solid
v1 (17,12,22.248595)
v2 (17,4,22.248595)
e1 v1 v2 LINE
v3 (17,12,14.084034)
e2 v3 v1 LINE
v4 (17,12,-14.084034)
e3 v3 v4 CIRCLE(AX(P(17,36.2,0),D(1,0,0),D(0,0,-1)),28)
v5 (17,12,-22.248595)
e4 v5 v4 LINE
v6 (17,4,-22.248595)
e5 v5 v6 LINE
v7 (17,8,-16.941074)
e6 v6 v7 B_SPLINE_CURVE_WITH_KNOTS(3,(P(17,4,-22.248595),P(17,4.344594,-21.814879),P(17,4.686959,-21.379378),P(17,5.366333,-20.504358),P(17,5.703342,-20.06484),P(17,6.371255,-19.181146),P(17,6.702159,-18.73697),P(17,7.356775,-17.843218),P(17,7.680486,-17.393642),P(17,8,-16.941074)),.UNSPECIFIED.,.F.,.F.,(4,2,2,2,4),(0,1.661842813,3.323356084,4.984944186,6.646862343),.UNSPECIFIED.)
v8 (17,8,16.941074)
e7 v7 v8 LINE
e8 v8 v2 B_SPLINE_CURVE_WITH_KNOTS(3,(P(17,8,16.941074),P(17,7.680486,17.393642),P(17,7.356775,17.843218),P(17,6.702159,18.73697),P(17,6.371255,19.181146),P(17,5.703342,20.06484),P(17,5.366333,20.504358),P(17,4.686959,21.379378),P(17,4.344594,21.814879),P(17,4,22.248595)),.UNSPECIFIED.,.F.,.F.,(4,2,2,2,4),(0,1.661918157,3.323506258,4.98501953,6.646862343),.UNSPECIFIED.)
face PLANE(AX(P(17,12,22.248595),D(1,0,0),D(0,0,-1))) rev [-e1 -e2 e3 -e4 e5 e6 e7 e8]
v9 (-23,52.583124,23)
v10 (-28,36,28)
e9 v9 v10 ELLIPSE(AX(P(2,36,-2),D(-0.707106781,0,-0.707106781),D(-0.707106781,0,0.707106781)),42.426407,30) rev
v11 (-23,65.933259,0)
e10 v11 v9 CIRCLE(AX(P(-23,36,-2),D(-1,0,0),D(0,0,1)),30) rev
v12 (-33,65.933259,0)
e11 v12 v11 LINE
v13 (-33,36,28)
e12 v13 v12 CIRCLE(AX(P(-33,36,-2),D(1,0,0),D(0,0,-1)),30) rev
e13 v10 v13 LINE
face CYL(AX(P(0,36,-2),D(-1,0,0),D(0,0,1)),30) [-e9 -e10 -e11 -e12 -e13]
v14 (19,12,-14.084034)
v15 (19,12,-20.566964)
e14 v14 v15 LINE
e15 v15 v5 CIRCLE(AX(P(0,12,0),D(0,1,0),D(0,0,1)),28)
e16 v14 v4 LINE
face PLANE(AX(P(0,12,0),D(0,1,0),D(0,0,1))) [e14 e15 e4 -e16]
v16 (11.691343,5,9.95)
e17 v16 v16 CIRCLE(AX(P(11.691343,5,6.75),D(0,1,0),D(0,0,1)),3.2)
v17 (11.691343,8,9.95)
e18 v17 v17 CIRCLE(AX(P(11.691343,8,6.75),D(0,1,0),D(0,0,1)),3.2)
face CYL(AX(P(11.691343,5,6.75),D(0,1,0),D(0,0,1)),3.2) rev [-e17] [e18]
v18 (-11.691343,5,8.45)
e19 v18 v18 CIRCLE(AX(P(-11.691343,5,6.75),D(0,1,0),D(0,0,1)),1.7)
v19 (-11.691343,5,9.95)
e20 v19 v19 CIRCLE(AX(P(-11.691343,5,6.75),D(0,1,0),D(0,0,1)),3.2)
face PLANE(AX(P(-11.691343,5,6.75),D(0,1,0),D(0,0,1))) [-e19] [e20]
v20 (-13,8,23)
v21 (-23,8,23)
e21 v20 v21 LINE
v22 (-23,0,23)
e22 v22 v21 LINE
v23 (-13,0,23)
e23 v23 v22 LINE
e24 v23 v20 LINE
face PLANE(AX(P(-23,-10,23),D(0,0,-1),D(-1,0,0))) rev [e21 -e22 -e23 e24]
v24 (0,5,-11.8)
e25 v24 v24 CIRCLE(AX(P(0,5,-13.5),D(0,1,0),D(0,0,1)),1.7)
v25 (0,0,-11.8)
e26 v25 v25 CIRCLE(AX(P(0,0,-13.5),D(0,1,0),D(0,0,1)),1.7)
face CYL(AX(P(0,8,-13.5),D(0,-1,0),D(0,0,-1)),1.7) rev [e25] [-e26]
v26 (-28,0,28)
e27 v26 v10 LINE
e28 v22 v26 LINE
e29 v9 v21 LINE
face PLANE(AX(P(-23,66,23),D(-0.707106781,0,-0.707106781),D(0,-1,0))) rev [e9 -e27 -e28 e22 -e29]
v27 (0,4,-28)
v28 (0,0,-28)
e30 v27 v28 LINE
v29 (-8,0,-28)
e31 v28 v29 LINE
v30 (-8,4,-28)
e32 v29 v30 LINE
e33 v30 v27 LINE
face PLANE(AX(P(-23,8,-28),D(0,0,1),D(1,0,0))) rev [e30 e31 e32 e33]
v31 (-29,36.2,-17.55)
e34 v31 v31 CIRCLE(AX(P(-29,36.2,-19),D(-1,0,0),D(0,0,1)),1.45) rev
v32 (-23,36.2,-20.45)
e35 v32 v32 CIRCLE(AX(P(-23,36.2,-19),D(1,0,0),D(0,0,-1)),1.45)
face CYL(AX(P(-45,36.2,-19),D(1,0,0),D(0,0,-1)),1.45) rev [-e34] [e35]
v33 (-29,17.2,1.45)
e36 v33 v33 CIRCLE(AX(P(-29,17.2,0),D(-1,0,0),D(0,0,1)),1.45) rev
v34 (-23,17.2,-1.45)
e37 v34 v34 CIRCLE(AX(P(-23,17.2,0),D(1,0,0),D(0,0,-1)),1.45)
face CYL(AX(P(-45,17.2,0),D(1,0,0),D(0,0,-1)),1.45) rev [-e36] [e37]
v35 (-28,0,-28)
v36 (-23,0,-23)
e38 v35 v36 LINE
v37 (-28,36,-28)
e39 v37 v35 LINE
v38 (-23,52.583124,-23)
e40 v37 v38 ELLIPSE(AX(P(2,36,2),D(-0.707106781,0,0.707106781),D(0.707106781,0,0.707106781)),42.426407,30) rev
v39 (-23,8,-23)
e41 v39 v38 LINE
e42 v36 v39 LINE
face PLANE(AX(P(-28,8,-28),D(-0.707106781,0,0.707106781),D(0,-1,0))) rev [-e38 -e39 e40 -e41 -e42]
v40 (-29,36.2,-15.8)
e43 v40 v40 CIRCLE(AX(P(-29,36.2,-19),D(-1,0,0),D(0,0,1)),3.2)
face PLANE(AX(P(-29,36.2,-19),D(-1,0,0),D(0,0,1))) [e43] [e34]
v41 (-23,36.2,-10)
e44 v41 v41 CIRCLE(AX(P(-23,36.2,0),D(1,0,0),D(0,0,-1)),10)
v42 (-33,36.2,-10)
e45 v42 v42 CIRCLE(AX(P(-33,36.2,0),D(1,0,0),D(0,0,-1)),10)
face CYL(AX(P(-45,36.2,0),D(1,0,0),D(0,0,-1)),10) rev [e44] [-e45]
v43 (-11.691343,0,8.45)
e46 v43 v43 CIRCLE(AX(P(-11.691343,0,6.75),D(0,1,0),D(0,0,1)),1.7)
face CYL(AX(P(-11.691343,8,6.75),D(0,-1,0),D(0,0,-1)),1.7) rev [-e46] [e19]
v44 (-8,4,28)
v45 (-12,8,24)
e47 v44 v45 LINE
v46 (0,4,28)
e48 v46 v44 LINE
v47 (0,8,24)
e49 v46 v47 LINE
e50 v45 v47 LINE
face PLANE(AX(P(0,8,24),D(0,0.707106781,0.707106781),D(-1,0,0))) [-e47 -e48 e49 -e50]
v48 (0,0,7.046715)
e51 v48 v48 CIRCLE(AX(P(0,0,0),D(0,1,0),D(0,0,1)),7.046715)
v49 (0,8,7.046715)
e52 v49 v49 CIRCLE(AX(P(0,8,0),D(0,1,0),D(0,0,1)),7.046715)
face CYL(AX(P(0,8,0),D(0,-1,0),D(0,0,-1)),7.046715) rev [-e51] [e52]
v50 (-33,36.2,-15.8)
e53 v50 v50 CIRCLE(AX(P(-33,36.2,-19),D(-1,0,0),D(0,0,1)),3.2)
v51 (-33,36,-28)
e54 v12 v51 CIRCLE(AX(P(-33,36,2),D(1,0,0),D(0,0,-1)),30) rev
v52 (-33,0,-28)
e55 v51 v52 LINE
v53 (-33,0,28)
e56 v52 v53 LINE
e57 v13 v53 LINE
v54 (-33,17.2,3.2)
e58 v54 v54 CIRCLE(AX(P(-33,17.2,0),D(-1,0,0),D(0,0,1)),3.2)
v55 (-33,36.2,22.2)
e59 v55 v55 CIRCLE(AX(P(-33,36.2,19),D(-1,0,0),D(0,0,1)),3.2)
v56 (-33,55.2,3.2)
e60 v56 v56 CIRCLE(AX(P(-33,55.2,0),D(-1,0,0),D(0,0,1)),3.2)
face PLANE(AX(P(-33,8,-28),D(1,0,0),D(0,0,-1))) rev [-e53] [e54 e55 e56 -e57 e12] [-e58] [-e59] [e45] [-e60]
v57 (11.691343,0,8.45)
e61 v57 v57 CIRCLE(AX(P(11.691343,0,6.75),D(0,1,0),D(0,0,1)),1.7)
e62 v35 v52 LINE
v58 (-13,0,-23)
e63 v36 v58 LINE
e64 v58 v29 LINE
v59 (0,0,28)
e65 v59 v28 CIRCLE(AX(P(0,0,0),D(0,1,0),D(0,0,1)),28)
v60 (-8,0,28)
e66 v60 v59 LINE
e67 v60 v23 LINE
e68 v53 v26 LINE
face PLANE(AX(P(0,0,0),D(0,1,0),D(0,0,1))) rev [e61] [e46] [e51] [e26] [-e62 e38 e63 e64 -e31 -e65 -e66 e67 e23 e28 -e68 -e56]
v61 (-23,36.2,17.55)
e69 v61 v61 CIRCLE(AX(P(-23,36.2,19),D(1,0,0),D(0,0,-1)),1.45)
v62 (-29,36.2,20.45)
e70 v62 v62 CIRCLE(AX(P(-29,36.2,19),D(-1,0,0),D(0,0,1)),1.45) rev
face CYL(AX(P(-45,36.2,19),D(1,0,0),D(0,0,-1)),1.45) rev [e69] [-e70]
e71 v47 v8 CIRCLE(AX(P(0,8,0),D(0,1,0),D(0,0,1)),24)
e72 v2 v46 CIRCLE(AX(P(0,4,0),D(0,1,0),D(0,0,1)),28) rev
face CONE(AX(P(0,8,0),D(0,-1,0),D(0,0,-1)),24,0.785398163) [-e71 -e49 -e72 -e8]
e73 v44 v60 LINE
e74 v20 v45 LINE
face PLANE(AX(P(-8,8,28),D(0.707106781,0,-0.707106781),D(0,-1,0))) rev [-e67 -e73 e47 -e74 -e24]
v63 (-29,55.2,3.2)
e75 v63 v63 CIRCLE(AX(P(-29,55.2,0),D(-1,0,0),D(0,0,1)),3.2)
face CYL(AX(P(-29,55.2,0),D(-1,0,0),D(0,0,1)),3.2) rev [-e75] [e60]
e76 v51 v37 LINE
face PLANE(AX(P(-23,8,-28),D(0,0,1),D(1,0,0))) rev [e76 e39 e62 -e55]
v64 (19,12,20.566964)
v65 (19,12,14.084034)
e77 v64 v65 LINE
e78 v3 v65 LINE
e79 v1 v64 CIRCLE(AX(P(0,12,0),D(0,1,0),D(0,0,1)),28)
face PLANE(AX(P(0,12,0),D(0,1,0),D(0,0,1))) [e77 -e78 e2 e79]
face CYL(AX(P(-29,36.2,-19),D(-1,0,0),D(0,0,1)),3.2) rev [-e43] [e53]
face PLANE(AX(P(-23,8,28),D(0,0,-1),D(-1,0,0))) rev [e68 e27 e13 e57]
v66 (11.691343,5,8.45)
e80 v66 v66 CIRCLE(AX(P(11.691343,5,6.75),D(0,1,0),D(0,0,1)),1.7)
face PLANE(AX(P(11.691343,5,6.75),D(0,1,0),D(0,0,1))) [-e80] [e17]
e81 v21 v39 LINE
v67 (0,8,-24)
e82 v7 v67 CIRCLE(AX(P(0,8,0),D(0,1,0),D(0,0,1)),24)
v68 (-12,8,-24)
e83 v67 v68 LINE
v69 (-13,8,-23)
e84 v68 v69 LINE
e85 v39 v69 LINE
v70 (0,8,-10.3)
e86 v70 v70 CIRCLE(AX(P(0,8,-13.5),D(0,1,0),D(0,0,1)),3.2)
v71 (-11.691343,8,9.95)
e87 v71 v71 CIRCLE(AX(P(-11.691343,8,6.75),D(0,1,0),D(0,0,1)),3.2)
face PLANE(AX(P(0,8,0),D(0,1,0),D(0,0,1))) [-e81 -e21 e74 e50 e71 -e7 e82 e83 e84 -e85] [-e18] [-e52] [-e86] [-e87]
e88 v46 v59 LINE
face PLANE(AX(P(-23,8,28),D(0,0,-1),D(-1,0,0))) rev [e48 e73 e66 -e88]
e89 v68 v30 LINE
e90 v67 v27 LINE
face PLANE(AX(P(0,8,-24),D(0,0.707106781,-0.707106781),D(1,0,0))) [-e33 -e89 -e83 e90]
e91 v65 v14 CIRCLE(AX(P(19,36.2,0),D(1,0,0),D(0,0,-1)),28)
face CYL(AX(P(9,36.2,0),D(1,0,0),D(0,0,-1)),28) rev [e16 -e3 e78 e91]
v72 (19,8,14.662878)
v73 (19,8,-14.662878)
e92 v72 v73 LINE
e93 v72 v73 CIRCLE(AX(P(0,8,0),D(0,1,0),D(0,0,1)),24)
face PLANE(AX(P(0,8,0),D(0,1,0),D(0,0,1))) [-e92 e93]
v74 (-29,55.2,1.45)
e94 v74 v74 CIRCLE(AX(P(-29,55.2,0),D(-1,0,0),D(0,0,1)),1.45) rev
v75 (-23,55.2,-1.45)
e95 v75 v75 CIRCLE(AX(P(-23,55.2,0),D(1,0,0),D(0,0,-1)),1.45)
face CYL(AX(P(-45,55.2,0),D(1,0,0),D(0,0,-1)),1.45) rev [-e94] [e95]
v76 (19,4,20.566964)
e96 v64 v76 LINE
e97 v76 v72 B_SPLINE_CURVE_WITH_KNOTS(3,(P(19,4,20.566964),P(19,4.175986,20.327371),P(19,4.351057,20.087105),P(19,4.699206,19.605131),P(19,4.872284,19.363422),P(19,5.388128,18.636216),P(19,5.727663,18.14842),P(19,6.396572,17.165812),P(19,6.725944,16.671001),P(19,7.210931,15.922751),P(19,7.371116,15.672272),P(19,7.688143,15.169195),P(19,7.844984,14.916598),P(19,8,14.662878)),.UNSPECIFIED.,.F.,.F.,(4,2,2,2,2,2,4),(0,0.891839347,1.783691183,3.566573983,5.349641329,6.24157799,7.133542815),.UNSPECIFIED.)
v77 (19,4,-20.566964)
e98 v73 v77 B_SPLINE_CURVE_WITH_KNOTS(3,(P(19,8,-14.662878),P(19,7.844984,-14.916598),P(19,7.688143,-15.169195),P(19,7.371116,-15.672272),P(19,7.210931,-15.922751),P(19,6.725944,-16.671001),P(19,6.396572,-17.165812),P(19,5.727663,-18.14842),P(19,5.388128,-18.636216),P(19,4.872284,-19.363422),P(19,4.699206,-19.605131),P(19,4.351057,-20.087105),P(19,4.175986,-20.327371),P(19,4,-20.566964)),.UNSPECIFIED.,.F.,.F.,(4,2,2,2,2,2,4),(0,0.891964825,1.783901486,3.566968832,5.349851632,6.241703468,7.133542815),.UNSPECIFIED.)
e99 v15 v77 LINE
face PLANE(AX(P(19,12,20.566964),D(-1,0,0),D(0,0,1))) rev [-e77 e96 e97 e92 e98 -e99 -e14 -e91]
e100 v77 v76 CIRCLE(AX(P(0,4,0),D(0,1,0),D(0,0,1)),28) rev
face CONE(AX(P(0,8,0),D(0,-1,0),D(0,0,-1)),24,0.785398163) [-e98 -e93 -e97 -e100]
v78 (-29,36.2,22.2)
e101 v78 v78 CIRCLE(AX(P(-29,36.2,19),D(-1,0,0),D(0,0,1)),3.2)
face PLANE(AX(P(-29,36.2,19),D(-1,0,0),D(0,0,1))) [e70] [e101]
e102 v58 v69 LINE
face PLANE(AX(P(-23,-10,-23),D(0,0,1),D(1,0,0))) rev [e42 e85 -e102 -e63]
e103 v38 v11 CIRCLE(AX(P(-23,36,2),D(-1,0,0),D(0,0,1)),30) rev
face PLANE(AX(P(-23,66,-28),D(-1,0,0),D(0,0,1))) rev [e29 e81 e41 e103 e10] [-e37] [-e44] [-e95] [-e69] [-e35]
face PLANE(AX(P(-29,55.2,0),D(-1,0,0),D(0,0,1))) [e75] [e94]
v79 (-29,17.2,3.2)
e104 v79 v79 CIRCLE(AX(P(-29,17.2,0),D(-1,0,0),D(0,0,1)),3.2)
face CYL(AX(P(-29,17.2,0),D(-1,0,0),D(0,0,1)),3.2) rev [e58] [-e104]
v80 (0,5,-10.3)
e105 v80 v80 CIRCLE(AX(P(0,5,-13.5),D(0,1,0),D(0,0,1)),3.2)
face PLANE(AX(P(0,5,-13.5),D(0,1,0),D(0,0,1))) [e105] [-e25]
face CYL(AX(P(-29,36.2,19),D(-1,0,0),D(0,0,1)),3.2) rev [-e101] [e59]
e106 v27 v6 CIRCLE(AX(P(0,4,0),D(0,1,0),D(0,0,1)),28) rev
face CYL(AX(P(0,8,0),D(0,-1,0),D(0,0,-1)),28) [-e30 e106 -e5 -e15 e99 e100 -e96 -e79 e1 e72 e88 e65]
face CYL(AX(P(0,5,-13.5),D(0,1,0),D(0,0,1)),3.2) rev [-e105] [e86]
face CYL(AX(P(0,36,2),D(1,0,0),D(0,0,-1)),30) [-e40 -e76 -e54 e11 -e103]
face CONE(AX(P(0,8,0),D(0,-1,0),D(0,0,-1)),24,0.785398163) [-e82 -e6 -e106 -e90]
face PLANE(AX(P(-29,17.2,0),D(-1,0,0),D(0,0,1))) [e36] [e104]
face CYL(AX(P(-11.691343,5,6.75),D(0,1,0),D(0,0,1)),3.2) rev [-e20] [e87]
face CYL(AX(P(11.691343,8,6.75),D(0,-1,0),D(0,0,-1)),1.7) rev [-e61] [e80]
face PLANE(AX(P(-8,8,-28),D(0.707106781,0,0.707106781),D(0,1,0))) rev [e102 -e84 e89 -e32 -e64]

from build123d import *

# Parameters (mm, degrees)
SKETCH_1_R          = 1.7
SKETCH_1_R_2        = 7.046714779
EXTRUDE_2_DEPTH     = 8
SKETCH_2_W          = 10
SKETCH_2_H          = 56
EXTRUDE_3_DEPTH     = 58
SKETCH_3_R          = 1.45
SKETCH_3_R_2        = 10
CUT_EXTRUDE_1_DEPTH = 22
SKETCH_5_W          = 10
SKETCH_5_H          = 20.367119739
CUT_EXTRUDE_3_DEPTH = 18
CHAMFER_1_SIZE      = 5
FILLET_1_R          = 30
SKETCH_6_R          = 3.2
CUT_EXTRUDE_4_DEPTH = 4
SKETCH_7_R          = 3.2
CUT_EXTRUDE_5_DEPTH = 3
EXTRUDE_4_DEPTH     = 4
SKETCH_9_R          = 28
CUT_EXTRUDE_6_DEPTH = 10
CHAMFER_2_SIZE      = 4


# Some blends are built 0.0001 mm under size
with BuildPart() as part:
    # 草图1 → 凸台-拉伸2 (new body)
    with BuildSketch(Plane(origin=(0, 0, 0), x_dir=(1, 0, 0), z_dir=(0, 1, 0))):
        with BuildLine():
            Line((-23, 28), (-33, 28))
            Line((-33, 28), (-33, -28))
            Line((-33, -28), (-23, -28))
            Line((-23, -28), (0, -28))
            ThreePointArc((0, -28), (28, 0), (0, 28))
            Line((0, 28), (-23, 28))
        make_face()
        with Locations(Location((0, 13.5, 0), (0, 0, 270))):
            Circle(SKETCH_1_R, mode=Mode.SUBTRACT)
        with Locations(Location((11.691342951, -6.75, 0), (0, 0, 270))):
            Circle(SKETCH_1_R, mode=Mode.SUBTRACT)
        with Locations(Location((-11.691342951, -6.75, 0), (0, 0, 270))):
            Circle(SKETCH_1_R, mode=Mode.SUBTRACT)
        with Locations(Location((0, 0, 0), (0, 0, 270))):
            Circle(SKETCH_1_R_2, mode=Mode.SUBTRACT)
    extrude(amount=EXTRUDE_2_DEPTH)

    # 草图2 → 凸台-拉伸3 (add)
    with BuildSketch(Plane(origin=(0, 8, 0), x_dir=(1, 0, 0), z_dir=(0, 1, 0))):
        with Locations((-28, 0)):
            Rectangle(SKETCH_2_W, SKETCH_2_H)
    extrude(amount=EXTRUDE_3_DEPTH)

    # 草图3 → 切除-拉伸1 (cut)
    with BuildSketch(Plane(origin=(-23, 0, 0), x_dir=(0, 0, -1), z_dir=(1, 0, 0))):
        with Locations((0, 55.2)):
            Circle(SKETCH_3_R)
        with Locations((19, 36.2)):
            Circle(SKETCH_3_R)
        with Locations((0, 17.2)):
            Circle(SKETCH_3_R)
        with Locations((-19, 36.2)):
            Circle(SKETCH_3_R)
        with Locations((0, 36.2)):
            Circle(SKETCH_3_R_2)
    extrude(amount=-CUT_EXTRUDE_1_DEPTH, mode=Mode.SUBTRACT)

    # 草图5 → 切除-拉伸3 (cut)
    with BuildSketch(Plane(origin=(0, 8, 0), x_dir=(1, 0, 0), z_dir=(0, 1, 0))):
        with Locations((-18, 33.18355987)):
            Rectangle(SKETCH_5_W, SKETCH_5_H)
        with Locations((-18, -33.18355987)):
            Rectangle(SKETCH_5_W, SKETCH_5_H)
    extrude(amount=-CUT_EXTRUDE_3_DEPTH, mode=Mode.SUBTRACT)

    # 倒角1
    chamfer_1_edges = [part.edges().sort_by_distance(p)[0] for p in [
        (-23, 33, 28),
        (-23, 33, -28),
        (-13, 4, -28),
        (-13, 4, 28),
    ]]
    chamfer(chamfer_1_edges, length=CHAMFER_1_SIZE - 0.0001)  # a hair under: the kernel refuses the full size

    # 圆角1
    # the kernel refuses this fillet: 30 mm, written as the material it takes off along each edge
    with BuildSketch(Plane(origin=(-108, 66, -28), x_dir=(0, -1, 0), z_dir=(1, 0, 0)), Plane(origin=(47.0001, 66, 28), x_dir=(0, -1, 0), z_dir=(-1, 0, 0))) as fillet_1_piece_1:
        with BuildLine():
            CenterArc((FILLET_1_R, -FILLET_1_R), FILLET_1_R, 90, 90)
            Line((0, -FILLET_1_R), (0, 0))
            Line((0, 0), (FILLET_1_R, 0))
        make_face()
    extrude(amount=155.0001, mode=Mode.SUBTRACT)

    # 草图6 → 切除-拉伸4 (cut)
    with BuildSketch(Plane.ZY.offset(33)):
        with Locations((-19, 36.2)):
            Circle(SKETCH_6_R)
        with Locations((0, 55.2)):
            Circle(SKETCH_6_R)
        with Locations((19, 36.2)):
            Circle(SKETCH_6_R)
        with Locations((0, 17.2)):
            Circle(SKETCH_6_R)
    extrude(amount=-CUT_EXTRUDE_4_DEPTH, mode=Mode.SUBTRACT)

    # 草图7 → 切除-拉伸5 (cut)
    with BuildSketch(Plane(origin=(0, 8, 0), x_dir=(1, 0, 0), z_dir=(0, 1, 0))):
        with Locations(Location((0, 13.5, 0), (0, 0, 270))):
            Circle(SKETCH_7_R)
        with Locations(Location((11.691342951, -6.75, 0), (0, 0, 270))):
            Circle(SKETCH_7_R)
        with Locations(Location((-11.691342951, -6.75, 0), (0, 0, 270))):
            Circle(SKETCH_7_R)
    extrude(amount=-CUT_EXTRUDE_5_DEPTH, mode=Mode.SUBTRACT)

    # 草图8 → 凸台-拉伸4 (add)
    with BuildSketch(Plane(origin=(0, 8, 0), x_dir=(1, 0, 0), z_dir=(0, 1, 0))):
        with BuildLine():
            Line((17, -22.248595461), (17, 22.248595461))
            ThreePointArc((17, 22.248595461), (18.01962739, 21.4311229), (19, 20.566963801))
            Line((19, 20.566963801), (19, -20.566963801))
            ThreePointArc((19, -20.566963801), (18.01962739, -21.4311229), (17, -22.248595461))
        make_face()
    extrude(amount=EXTRUDE_4_DEPTH)

    # 草图9 → 切除-拉伸6 (cut)
    with BuildSketch(Plane(origin=(19, 0, 0), x_dir=(0, 0, -1), z_dir=(1, 0, 0))):
        with Locations((0, 36.2)):
            Circle(SKETCH_9_R)
    extrude(amount=-CUT_EXTRUDE_6_DEPTH, mode=Mode.SUBTRACT)

    # 倒角2
    # the kernel refuses this chamfer: 4 mm, written as the material it takes off along each edge
    with BuildSketch(Plane(origin=(0, 8, 28), x_dir=(0, 0.027495876610586487, -0.9996219169112968), z_dir=(-1, 0, 0))) as chamfer_2_piece_1:
        Polygon((CHAMFER_2_SIZE * 0.999621916911, CHAMFER_2_SIZE * 0.0274958766106), (-CHAMFER_2_SIZE * 0.0274958766106, CHAMFER_2_SIZE * 0.999621916911), (0, 0), align=None)
    extrude(amount=18.286831952, mode=Mode.SUBTRACT)
    with BuildSketch(Plane(origin=(0, 8, 0), x_dir=(0.369313229341893, 0, 0.9293049761155173), z_dir=(-0.9293049761155173, 0, 0.369313229341893))) as chamfer_2_piece_2_section:
        Polygon((28, -CHAMFER_2_SIZE), (28 - CHAMFER_2_SIZE, 0), (28, 0), align=None)
    chamfer_2_piece_2 = revolve(axis=Axis((0, 8, 0), (0, 1, 0)), revolution_arc=136.653462803, mode=Mode.PRIVATE)
    chamfer_2_piece_2 = split(chamfer_2_piece_2, bisect_by=Plane(origin=(17, 6.694433411, 22.783727906), z_dir=(-1, 0, 0)), keep=Keep.TOP, mode=Mode.PRIVATE)
    add(chamfer_2_piece_2, mode=Mode.SUBTRACT)
    with BuildSketch(Plane(origin=(0, 8, 0), x_dir=(0.369313229341893, 0, 0.9293049761155173), z_dir=(-0.9293049761155173, 0, 0.369313229341893))) as chamfer_2_piece_3_section:
        Polygon((28, -CHAMFER_2_SIZE), (28 - CHAMFER_2_SIZE, 0), (28, 0), align=None)
    chamfer_2_piece_3 = revolve(axis=Axis((0, 8, 0), (0, 1, 0)), revolution_arc=136.653462803, mode=Mode.PRIVATE)
    chamfer_2_piece_3 = split(chamfer_2_piece_3, bisect_by=Plane(origin=(19, 6.048939882, 0), z_dir=(1, 0, 0)), keep=Keep.TOP, mode=Mode.PRIVATE)
    add(chamfer_2_piece_3, mode=Mode.SUBTRACT)
    with BuildSketch(Plane(origin=(0, 8, 0), x_dir=(0.8520392640465919, 0, -0.5234778815985848), z_dir=(0.5234778815985848, 0, 0.8520392640465919))) as chamfer_2_piece_4_section:
        Polygon((28, -CHAMFER_2_SIZE), (28 - CHAMFER_2_SIZE, 0), (28, 0), align=None)
    chamfer_2_piece_4 = revolve(axis=Axis((0, 8, 0), (0, 1, 0)), revolution_arc=58.434168598, mode=Mode.PRIVATE)
    chamfer_2_piece_4 = split(chamfer_2_piece_4, bisect_by=Plane(origin=(19, 6.574014783, -16.582020982), z_dir=(1, 0, 0)), keep=Keep.TOP, mode=Mode.PRIVATE)
    add(chamfer_2_piece_4, mode=Mode.SUBTRACT)
    with BuildSketch(Plane(origin=(0, 8, 0), x_dir=(0.8520392640465919, 0, -0.5234778815985848), z_dir=(0.5234778815985848, 0, 0.8520392640465919))) as chamfer_2_piece_5_section:
        Polygon((28, -CHAMFER_2_SIZE), (28 - CHAMFER_2_SIZE, 0), (28, 0), align=None)
    chamfer_2_piece_5 = revolve(axis=Axis((0, 8, 0), (0, 1, 0)), revolution_arc=58.434168598, mode=Mode.PRIVATE)
    chamfer_2_piece_5 = split(chamfer_2_piece_5, bisect_by=Plane(origin=(17, 6.670131388, -24.579888545), z_dir=(-1, 0, 0)), keep=Keep.TOP, mode=Mode.PRIVATE)
    add(chamfer_2_piece_5, mode=Mode.SUBTRACT)
    with BuildSketch(Plane(origin=(0, 8, 0), x_dir=(0, 0, 1), z_dir=(-1, 0, 0))) as chamfer_2_piece_6_section:
        Polygon((28, -CHAMFER_2_SIZE), (28 - CHAMFER_2_SIZE, 0), (28, 0), align=None)
    chamfer_2_piece_6 = revolve(axis=Axis((0, 8, 0), (0, 1, 0)), revolution_arc=58.434168598, mode=Mode.PRIVATE)
    chamfer_2_piece_6 = split(chamfer_2_piece_6, bisect_by=Plane(origin=(17, 6.670131388, 24.579888545), z_dir=(-1, 0, 0)), keep=Keep.TOP, mode=Mode.PRIVATE)
    add(chamfer_2_piece_6, mode=Mode.SUBTRACT)
    with BuildSketch(Plane(origin=(0, 8, 0), x_dir=(0, 0, 1), z_dir=(-1, 0, 0))) as chamfer_2_piece_7_section:
        Polygon((28, -CHAMFER_2_SIZE), (28 - CHAMFER_2_SIZE, 0), (28, 0), align=None)
    chamfer_2_piece_7 = revolve(axis=Axis((0, 8, 0), (0, 1, 0)), revolution_arc=58.434168598, mode=Mode.PRIVATE)
    chamfer_2_piece_7 = split(chamfer_2_piece_7, bisect_by=Plane(origin=(19, 6.574014783, 16.582020982), z_dir=(1, 0, 0)), keep=Keep.TOP, mode=Mode.PRIVATE)
    add(chamfer_2_piece_7, mode=Mode.SUBTRACT)
    with BuildSketch(Plane(origin=(-18.286831952, 8, -28), x_dir=(0, -0.9996219169112968, -0.027495876610586487), z_dir=(1, 0, 0))) as chamfer_2_piece_8:
        Polygon((CHAMFER_2_SIZE * 0.999621916911, -CHAMFER_2_SIZE * 0.0274958766106), (-CHAMFER_2_SIZE * 0.0274958766106, -CHAMFER_2_SIZE * 0.999621916911), (0, 0), align=None)
    extrude(amount=18.286831952, mode=Mode.SUBTRACT)


solid = part.part
